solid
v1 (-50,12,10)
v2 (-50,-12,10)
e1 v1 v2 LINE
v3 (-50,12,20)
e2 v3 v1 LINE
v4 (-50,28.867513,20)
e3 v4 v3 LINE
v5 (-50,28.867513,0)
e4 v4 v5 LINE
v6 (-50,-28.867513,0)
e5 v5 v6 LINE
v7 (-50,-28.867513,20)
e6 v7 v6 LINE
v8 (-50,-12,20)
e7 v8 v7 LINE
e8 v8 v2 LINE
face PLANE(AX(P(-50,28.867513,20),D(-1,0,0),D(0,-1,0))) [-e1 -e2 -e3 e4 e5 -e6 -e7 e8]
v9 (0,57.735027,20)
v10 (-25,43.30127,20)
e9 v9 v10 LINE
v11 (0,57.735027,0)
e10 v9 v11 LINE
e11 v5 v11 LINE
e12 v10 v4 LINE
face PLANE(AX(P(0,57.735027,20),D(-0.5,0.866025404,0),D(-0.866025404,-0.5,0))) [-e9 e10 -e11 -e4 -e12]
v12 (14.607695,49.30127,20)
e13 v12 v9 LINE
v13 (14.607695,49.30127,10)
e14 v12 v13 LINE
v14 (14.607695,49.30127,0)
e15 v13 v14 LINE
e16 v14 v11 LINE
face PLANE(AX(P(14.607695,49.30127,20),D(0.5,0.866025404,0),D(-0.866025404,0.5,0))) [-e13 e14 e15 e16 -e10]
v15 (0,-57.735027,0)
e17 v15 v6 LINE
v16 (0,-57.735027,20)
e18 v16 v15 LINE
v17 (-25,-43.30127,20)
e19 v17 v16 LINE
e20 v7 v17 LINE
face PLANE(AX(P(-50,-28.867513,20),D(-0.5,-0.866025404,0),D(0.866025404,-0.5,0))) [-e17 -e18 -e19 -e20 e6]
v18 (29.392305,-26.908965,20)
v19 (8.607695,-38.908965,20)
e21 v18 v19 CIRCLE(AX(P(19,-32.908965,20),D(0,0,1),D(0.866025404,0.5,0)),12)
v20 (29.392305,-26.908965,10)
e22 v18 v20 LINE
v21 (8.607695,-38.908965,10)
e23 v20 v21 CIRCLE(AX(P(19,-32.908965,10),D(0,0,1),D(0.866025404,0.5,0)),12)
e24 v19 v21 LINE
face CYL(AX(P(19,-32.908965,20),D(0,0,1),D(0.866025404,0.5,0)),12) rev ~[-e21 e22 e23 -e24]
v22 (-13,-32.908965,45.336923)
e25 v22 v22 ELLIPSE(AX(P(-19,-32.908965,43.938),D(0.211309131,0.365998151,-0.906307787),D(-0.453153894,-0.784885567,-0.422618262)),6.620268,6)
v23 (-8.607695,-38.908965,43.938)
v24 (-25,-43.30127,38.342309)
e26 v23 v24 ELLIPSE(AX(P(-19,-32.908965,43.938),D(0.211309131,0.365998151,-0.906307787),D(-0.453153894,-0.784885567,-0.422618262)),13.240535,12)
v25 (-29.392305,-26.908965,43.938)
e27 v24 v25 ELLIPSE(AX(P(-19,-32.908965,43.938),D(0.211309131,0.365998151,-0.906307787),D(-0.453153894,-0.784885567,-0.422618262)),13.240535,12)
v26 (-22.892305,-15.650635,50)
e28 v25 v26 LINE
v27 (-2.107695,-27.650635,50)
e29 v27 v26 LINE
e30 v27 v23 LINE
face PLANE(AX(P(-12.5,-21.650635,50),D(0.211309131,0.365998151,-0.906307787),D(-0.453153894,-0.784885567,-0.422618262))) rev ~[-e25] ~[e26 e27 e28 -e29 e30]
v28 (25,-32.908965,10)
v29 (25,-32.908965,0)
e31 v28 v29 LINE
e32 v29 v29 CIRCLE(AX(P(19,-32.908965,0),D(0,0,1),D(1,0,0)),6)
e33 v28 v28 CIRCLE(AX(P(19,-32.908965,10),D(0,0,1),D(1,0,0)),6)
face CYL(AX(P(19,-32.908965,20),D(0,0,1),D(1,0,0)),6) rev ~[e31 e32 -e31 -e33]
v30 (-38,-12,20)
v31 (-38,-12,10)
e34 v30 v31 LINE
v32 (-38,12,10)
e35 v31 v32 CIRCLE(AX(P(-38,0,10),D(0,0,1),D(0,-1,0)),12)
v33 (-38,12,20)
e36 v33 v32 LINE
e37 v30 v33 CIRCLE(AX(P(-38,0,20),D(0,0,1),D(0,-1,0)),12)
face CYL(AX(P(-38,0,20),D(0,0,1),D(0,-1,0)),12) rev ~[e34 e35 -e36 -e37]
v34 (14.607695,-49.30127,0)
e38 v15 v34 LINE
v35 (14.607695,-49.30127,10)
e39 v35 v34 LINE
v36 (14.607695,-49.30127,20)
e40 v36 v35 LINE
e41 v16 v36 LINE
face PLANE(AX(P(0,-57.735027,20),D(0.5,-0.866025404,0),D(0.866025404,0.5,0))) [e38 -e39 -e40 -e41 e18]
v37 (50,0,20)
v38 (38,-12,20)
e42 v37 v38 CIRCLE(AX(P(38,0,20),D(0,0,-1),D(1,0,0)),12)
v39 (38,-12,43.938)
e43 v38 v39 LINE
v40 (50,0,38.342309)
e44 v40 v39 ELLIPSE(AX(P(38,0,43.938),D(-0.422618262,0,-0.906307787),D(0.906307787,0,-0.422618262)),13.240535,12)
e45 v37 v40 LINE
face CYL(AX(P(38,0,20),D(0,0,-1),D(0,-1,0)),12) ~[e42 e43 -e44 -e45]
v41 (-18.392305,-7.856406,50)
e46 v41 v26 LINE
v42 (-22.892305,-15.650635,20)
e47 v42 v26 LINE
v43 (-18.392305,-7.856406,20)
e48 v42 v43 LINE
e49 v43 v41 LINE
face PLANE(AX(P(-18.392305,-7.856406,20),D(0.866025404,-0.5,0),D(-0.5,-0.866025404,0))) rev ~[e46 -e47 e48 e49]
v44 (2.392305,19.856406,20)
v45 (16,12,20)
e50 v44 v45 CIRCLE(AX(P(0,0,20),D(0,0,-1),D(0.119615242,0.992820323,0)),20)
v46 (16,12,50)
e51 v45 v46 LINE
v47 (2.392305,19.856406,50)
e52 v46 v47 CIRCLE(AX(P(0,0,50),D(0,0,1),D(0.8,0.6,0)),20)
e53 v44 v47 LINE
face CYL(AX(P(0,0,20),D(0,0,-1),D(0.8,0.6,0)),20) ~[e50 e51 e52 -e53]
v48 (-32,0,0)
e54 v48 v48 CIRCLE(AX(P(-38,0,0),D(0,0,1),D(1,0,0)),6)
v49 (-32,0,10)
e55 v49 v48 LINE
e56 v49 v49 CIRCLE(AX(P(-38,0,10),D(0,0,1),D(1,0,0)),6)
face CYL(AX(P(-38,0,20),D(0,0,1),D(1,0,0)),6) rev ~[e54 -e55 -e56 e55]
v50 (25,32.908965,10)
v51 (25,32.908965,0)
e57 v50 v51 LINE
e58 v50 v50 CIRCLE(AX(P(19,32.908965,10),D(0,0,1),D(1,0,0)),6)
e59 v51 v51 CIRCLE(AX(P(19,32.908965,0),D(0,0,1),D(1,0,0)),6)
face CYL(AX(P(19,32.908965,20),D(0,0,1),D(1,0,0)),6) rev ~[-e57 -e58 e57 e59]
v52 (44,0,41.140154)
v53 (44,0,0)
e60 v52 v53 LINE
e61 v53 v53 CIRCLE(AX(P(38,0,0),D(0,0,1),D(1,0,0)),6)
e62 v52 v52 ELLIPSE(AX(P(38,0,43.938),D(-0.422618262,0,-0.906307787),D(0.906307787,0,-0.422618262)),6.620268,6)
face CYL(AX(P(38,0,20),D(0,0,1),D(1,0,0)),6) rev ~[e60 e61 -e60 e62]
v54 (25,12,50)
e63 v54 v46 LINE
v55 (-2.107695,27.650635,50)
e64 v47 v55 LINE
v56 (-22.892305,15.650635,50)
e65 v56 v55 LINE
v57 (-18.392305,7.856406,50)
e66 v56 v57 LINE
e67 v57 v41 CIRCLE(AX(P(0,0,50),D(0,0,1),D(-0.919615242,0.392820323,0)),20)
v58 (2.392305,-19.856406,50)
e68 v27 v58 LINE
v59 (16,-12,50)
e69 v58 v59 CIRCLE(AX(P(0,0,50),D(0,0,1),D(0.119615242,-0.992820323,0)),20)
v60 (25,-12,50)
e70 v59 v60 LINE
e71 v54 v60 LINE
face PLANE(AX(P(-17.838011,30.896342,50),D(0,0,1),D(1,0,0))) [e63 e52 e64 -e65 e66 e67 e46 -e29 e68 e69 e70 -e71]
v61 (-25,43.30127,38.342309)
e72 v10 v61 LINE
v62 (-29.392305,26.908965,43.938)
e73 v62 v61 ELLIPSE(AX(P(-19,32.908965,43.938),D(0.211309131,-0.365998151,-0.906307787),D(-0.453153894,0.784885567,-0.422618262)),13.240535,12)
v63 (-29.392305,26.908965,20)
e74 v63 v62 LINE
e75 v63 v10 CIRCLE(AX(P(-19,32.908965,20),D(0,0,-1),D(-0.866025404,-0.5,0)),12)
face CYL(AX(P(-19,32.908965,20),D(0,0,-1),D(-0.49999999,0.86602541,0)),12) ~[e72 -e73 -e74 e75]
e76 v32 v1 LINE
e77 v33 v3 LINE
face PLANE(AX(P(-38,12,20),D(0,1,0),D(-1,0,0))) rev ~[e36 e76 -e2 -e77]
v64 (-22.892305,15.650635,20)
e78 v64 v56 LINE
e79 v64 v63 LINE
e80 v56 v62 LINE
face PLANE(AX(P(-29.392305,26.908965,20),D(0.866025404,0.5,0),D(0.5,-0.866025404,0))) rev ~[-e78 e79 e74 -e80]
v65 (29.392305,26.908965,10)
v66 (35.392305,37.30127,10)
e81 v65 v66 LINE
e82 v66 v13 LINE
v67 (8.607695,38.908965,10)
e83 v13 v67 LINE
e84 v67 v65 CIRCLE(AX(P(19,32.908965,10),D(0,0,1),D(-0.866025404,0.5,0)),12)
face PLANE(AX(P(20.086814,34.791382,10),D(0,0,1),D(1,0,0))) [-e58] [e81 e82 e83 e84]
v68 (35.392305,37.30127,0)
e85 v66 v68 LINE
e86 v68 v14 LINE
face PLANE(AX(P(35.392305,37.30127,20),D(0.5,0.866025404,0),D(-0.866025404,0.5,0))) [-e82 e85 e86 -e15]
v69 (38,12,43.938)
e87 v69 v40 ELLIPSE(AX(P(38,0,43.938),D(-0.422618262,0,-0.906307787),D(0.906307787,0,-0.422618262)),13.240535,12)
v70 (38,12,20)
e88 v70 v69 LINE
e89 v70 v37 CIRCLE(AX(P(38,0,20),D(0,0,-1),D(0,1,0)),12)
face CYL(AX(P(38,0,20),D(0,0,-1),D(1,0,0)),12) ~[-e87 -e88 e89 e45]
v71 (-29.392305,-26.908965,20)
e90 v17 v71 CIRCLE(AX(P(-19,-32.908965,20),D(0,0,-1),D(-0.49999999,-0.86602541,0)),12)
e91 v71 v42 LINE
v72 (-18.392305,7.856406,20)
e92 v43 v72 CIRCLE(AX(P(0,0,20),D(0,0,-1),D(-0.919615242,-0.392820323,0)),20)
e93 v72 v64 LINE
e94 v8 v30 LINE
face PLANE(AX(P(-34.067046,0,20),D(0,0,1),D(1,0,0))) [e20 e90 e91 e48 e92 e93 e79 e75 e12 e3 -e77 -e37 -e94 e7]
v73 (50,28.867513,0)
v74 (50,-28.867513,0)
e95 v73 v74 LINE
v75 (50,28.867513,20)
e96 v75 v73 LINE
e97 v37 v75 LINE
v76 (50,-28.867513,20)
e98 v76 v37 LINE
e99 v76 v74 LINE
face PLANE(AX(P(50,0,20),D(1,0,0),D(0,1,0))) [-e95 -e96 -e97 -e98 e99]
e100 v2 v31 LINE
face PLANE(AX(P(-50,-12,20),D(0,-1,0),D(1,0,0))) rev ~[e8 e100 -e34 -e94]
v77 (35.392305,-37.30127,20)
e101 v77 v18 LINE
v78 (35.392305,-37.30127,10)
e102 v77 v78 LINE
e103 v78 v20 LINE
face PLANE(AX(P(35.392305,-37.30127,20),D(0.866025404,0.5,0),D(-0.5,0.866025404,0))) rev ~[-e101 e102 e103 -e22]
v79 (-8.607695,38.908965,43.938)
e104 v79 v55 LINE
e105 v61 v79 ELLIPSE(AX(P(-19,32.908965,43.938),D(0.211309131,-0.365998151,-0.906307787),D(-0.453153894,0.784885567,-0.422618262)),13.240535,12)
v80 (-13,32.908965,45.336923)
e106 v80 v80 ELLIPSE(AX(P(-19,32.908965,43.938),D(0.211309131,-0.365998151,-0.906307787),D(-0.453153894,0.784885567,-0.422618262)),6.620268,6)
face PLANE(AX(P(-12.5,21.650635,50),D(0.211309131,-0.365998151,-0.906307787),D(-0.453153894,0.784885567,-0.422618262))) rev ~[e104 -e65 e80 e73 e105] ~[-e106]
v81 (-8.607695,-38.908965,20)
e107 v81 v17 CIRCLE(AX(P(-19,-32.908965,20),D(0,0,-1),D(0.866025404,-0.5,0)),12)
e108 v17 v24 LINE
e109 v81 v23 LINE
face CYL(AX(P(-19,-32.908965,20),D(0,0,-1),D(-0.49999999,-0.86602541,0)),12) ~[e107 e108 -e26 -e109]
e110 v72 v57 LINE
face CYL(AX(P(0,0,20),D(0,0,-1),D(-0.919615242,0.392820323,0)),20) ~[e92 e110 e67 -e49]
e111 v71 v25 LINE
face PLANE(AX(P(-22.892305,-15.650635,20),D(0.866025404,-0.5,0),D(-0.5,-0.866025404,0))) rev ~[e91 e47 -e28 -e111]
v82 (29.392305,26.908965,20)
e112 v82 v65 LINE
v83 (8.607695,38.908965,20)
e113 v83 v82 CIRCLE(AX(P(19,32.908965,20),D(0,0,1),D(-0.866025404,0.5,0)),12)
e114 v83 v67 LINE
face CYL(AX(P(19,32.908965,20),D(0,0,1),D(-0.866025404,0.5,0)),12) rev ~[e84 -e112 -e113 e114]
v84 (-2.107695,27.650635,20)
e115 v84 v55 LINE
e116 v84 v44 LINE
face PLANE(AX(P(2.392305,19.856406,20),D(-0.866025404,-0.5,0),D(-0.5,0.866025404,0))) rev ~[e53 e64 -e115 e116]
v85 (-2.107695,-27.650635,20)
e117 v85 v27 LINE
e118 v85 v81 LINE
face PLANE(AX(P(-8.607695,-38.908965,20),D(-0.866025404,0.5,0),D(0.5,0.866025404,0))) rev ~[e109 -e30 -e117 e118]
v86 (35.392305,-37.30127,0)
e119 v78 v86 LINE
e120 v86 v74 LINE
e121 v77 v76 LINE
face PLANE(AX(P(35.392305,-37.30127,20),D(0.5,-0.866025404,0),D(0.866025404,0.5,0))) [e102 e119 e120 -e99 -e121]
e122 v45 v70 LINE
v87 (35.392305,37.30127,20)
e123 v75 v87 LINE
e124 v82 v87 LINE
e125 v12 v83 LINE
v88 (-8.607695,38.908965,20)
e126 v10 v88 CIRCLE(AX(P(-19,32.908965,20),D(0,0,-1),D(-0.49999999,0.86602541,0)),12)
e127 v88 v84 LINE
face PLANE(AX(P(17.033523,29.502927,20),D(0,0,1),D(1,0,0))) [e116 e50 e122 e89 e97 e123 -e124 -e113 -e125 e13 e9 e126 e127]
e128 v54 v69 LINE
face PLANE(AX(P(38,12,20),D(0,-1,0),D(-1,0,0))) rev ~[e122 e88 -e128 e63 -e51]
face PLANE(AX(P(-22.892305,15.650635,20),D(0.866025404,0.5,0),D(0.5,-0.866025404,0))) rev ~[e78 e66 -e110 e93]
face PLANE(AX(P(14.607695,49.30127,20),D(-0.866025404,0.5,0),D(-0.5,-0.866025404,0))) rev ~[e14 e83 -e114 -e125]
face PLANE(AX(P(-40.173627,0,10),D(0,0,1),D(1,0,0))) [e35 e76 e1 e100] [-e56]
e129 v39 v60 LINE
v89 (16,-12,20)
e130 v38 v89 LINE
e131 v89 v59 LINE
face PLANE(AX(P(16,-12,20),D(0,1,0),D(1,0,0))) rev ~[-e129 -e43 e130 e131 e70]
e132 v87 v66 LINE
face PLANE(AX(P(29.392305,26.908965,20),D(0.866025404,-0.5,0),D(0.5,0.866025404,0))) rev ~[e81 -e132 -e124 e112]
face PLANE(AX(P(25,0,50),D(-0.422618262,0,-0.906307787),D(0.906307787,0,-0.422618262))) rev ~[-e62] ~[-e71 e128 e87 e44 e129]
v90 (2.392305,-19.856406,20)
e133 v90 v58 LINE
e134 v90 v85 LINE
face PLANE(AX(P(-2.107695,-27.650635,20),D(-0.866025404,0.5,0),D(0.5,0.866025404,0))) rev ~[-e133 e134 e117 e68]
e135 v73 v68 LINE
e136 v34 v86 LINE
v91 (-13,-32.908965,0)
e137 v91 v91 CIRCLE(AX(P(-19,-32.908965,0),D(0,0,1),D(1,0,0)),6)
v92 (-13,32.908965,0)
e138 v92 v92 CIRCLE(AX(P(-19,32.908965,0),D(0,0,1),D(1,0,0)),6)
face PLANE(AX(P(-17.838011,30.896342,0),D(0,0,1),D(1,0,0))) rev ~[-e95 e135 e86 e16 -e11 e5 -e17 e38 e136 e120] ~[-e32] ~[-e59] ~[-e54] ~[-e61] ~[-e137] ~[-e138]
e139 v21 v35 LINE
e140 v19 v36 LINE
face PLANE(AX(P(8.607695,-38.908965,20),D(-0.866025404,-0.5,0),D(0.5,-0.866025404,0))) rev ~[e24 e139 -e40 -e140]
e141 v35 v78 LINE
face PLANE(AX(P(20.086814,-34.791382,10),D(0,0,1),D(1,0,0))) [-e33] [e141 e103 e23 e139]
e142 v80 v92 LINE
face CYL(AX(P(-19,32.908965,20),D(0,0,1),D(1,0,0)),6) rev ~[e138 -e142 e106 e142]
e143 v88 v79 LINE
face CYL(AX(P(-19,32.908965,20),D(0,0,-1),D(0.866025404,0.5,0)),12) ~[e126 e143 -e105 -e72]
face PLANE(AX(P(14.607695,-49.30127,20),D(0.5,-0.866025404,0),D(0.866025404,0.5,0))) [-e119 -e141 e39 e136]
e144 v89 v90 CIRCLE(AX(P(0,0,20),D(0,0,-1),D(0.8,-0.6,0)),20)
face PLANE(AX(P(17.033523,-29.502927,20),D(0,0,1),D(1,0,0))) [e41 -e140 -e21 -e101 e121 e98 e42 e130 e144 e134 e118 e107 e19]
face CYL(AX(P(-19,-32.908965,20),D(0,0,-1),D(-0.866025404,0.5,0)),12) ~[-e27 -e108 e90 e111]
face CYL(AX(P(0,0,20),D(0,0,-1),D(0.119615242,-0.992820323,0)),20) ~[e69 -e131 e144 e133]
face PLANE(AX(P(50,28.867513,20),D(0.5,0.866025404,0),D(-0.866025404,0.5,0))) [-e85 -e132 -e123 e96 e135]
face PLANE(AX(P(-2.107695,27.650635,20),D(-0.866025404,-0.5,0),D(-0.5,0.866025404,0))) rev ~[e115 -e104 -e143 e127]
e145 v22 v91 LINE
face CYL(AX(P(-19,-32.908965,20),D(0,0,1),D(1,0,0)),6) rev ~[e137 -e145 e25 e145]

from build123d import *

# Parameters (mm, degrees)
F1_R            = 6
F2_DEPTH        = 20
F3_DEPTH        = 30
F3_DEPTH_BACK   = 20
F4_DEPTH        = 10
F6_DEPTH        = 12.5
F6_COPIES_COUNT = 3


# Not quite as in the source:
# - a pattern or mirror of a feature is missing from the dataset's text; its kind, count and spacing are read off the source's solid


with BuildPart() as f2:
    # F1 (on offset) → F2 (new body, through all)
    with BuildSketch(Plane.XY.offset(20)):
        with BuildLine():
            ThreePointArc((-29.3923048454, 26.9089653438), (-30.5911098969, 36.0147939544), (-24.9999998757, 43.301270261))
            Line((-24.9999998757, 43.301270261), (-50, 28.8675134595))
            Line((-50, 28.8675134595), (-50, 12))
            Line((-50, 12), (-38, 12))
            ThreePointArc((-38, 12), (-26, 0), (-38, -12))
            Line((-38, -12), (-50, -12))
            Line((-50, -12), (-50, -28.8675134595))
            Line((-50, -28.8675134595), (-24.9999998757, -43.301270261))
            ThreePointArc((-24.9999998757, -43.301270261), (-30.5911098969, -36.0147939544), (-29.3923048454, -26.9089653438))
            Line((-29.3923048454, -26.9089653438), (-22.8923048454, -15.6506350946))
            Line((-22.8923048454, -15.6506350946), (-18.3923048454, -7.8564064606))
            ThreePointArc((-18.3923048454, -7.8564064606), (-20, 0), (-18.3923048454, 7.8564064606))
            Line((-18.3923048454, 7.8564064606), (-22.8923048454, 15.6506350946))
            Line((-22.8923048454, 15.6506350946), (-29.3923048454, 26.9089653438))
        make_face()
        with BuildLine():
            Line((-38, 12), (-50, 12))
            Line((-50, 12), (-50, -12))
            Line((-50, -12), (-38, -12))
            ThreePointArc((-38, -12), (-26, 0), (-38, 12))
        make_face()
        with Locations((-38, 0)):
            Circle(F1_R, mode=Mode.SUBTRACT)
    extrude(amount=-F2_DEPTH)



with BuildPart() as f2b:
    # F1 (on offset) → F2, piece 2 (new body, through all)
    with BuildSketch(Plane.XY.offset(20)):
        with BuildLine():
            Line((50, -28.8675134595), (50, 0))
            ThreePointArc((50, 0), (46.4852813742, -8.4852813742), (38, -12))
            Line((38, -12), (25, -12))
            Line((25, -12), (16, -12))
            ThreePointArc((16, -12), (10, -17.3205080757), (2.3923048454, -19.8564064606))
            Line((2.3923048454, -19.8564064606), (-2.1076951546, -27.6506350946))
            Line((-2.1076951546, -27.6506350946), (-8.6076951546, -38.9089653438))
            ThreePointArc((-8.6076951546, -38.9089653438), (-15.8941713895, -44.5000752407), (-24.9999998757, -43.301270261))
            Line((-24.9999998757, -43.301270261), (0, -57.735026919))
            Line((0, -57.735026919), (14.6076951546, -49.3012701892))
            Line((14.6076951546, -49.3012701892), (8.6076951546, -38.9089653438))
            ThreePointArc((8.6076951546, -38.9089653438), (13, -22.5166604984), (29.3923048454, -26.9089653438))
            Line((29.3923048454, -26.9089653438), (35.3923048454, -37.3012701892))
            Line((35.3923048454, -37.3012701892), (50, -28.8675134595))
        make_face()
        with BuildLine():
            Line((14.6076951546, -49.3012701892), (35.3923048454, -37.3012701892))
            Line((35.3923048454, -37.3012701892), (29.3923048454, -26.9089653438))
            ThreePointArc((29.3923048454, -26.9089653438), (13, -22.5166604984), (8.6076951546, -38.9089653438))
            Line((8.6076951546, -38.9089653438), (14.6076951546, -49.3012701892))
        make_face()
        with Locations((19, -32.9089653438)):
            Circle(F1_R, mode=Mode.SUBTRACT)
    extrude(amount=-F2_DEPTH)


with BuildPart() as f2c:
    # F1 (on offset) → F2, piece 3 (new body, through all)
    with BuildSketch(Plane.XY.offset(20)):
        with BuildLine():
            Line((50, 0), (50, 28.8675134595))
            Line((50, 28.8675134595), (35.3923048454, 37.3012701892))
            Line((35.3923048454, 37.3012701892), (29.3923048454, 26.9089653438))
            ThreePointArc((29.3923048454, 26.9089653438), (13, 22.5166604984), (8.6076951546, 38.9089653438))
            Line((8.6076951546, 38.9089653438), (14.6076951546, 49.3012701892))
            Line((14.6076951546, 49.3012701892), (0, 57.735026919))
            Line((0, 57.735026919), (-24.9999998757, 43.301270261))
            ThreePointArc((-24.9999998757, 43.301270261), (-15.8941713895, 44.5000752407), (-8.6076951546, 38.9089653438))
            Line((-8.6076951546, 38.9089653438), (-2.1076951546, 27.6506350946))
            Line((-2.1076951546, 27.6506350946), (2.3923048454, 19.8564064606))
            ThreePointArc((2.3923048454, 19.8564064606), (10, 17.3205080757), (16, 12))
            Line((16, 12), (25, 12))
            Line((25, 12), (38, 12))
            ThreePointArc((38, 12), (46.4852813742, 8.4852813742), (50, 0))
        make_face()
        with BuildLine():
            Line((29.3923048454, 26.9089653438), (35.3923048454, 37.3012701892))
            Line((35.3923048454, 37.3012701892), (14.6076951546, 49.3012701892))
            Line((14.6076951546, 49.3012701892), (8.6076951546, 38.9089653438))
            ThreePointArc((8.6076951546, 38.9089653438), (13, 22.5166604984), (29.3923048454, 26.9089653438))
        make_face()
        with Locations((19, 32.9089653438)):
            Circle(F1_R, mode=Mode.SUBTRACT)
    extrude(amount=-F2_DEPTH)


with BuildPart() as f2_1:
    add(f2.part)

    add(f2b.part)  # F3 merges F2b

    add(f2c.part)  # F3 merges F2c
    # F1 (on offset) → F3 (join, two sides)
    with BuildSketch(Plane.XY.offset(20)) as f3_sk:
        with BuildLine():
            ThreePointArc((-8.6076951546, 38.9089653438), (-15.8941713895, 44.5000752407), (-24.9999998757, 43.301270261))
            ThreePointArc((-24.9999998757, 43.301270261), (-30.5911098969, 36.0147939544), (-29.3923048454, 26.9089653438))
            Line((-29.3923048454, 26.9089653438), (-22.8923048454, 15.6506350946))
            Line((-22.8923048454, 15.6506350946), (-2.1076951546, 27.6506350946))
            Line((-2.1076951546, 27.6506350946), (-8.6076951546, 38.9089653438))
        make_face()
        with Locations((-19, 32.9089653438)):
            Circle(F1_R, mode=Mode.SUBTRACT)
        with BuildLine():
            Line((16, -12), (25, -12))
            Line((25, -12), (25, 12))
            Line((25, 12), (16, 12))
            ThreePointArc((16, 12), (10, 17.3205080757), (2.3923048454, 19.8564064606))
            Line((2.3923048454, 19.8564064606), (-2.1076951546, 27.6506350946))
            Line((-2.1076951546, 27.6506350946), (-22.8923048454, 15.6506350946))
            Line((-22.8923048454, 15.6506350946), (-18.3923048454, 7.8564064606))
            ThreePointArc((-18.3923048454, 7.8564064606), (-20, 0), (-18.3923048454, -7.8564064606))
            Line((-18.3923048454, -7.8564064606), (-22.8923048454, -15.6506350946))
            Line((-22.8923048454, -15.6506350946), (-2.1076951546, -27.6506350946))
            Line((-2.1076951546, -27.6506350946), (2.3923048454, -19.8564064606))
            ThreePointArc((2.3923048454, -19.8564064606), (10, -17.3205080757), (16, -12))
        make_face()
        with BuildLine():
            ThreePointArc((38, -12), (46.4852813742, -8.4852813742), (50, 0))
            ThreePointArc((50, 0), (46.4852813742, 8.4852813742), (38, 12))
            Line((38, 12), (25, 12))
            Line((25, 12), (25, -12))
            Line((25, -12), (38, -12))
        make_face()
        with Locations((38, 0)):
            Circle(F1_R, mode=Mode.SUBTRACT)
        with BuildLine():
            ThreePointArc((-29.3923048454, -26.9089653438), (-30.5911098969, -36.0147939544), (-24.9999998757, -43.301270261))
            ThreePointArc((-24.9999998757, -43.301270261), (-15.8941713895, -44.5000752407), (-8.6076951546, -38.9089653438))
            Line((-8.6076951546, -38.9089653438), (-2.1076951546, -27.6506350946))
            Line((-2.1076951546, -27.6506350946), (-22.8923048454, -15.6506350946))
            Line((-22.8923048454, -15.6506350946), (-29.3923048454, -26.9089653438))
        make_face()
        with Locations((-19, -32.9089653438)):
            Circle(F1_R, mode=Mode.SUBTRACT)
    extrude(amount=F3_DEPTH)
    extrude(f3_sk.sketch, amount=-F3_DEPTH_BACK)

    # F1 (on offset) → F4 (cut)
    with BuildSketch(Plane.XY.offset(20)):
        with BuildLine():
            Line((-38, 12), (-50, 12))
            Line((-50, 12), (-50, -12))
            Line((-50, -12), (-38, -12))
            ThreePointArc((-38, -12), (-26, 0), (-38, 12))
        make_face()
        with Locations((-38, 0)):
            Circle(F1_R, mode=Mode.SUBTRACT)
        with BuildLine():
            Line((14.6076951546, -49.3012701892), (35.3923048454, -37.3012701892))
            Line((35.3923048454, -37.3012701892), (29.3923048454, -26.9089653438))
            ThreePointArc((29.3923048454, -26.9089653438), (13, -22.5166604984), (8.6076951546, -38.9089653438))
            Line((8.6076951546, -38.9089653438), (14.6076951546, -49.3012701892))
        make_face()
        with Locations((19, -32.9089653438)):
            Circle(F1_R, mode=Mode.SUBTRACT)
        with BuildLine():
            Line((29.3923048454, 26.9089653438), (35.3923048454, 37.3012701892))
            Line((35.3923048454, 37.3012701892), (14.6076951546, 49.3012701892))
            Line((14.6076951546, 49.3012701892), (8.6076951546, 38.9089653438))
            ThreePointArc((8.6076951546, 38.9089653438), (13, 22.5166604984), (29.3923048454, 26.9089653438))
        make_face()
        with Locations((19, 32.9089653438)):
            Circle(F1_R, mode=Mode.SUBTRACT)
    extrude(amount=-F4_DEPTH, mode=Mode.SUBTRACT)

    # F5 (on Front) → F6 (cut, symmetric)
    with BuildSketch(Plane.XZ):
        Polygon((50, 50), (25, 50), (50, 38.3423085461), align=None)
    f6 = extrude(amount=F6_DEPTH, both=True, mode=Mode.SUBTRACT)

    # F6_copies: F6 ×3 about axis
    f6_copies_axis = Axis((0, 0, 0), (0, 0, 1))
    for i in range(1, F6_COPIES_COUNT):
        add(f6.rotate(f6_copies_axis, i * 360 / F6_COPIES_COUNT), mode=Mode.SUBTRACT)


solid = f2_1.part
